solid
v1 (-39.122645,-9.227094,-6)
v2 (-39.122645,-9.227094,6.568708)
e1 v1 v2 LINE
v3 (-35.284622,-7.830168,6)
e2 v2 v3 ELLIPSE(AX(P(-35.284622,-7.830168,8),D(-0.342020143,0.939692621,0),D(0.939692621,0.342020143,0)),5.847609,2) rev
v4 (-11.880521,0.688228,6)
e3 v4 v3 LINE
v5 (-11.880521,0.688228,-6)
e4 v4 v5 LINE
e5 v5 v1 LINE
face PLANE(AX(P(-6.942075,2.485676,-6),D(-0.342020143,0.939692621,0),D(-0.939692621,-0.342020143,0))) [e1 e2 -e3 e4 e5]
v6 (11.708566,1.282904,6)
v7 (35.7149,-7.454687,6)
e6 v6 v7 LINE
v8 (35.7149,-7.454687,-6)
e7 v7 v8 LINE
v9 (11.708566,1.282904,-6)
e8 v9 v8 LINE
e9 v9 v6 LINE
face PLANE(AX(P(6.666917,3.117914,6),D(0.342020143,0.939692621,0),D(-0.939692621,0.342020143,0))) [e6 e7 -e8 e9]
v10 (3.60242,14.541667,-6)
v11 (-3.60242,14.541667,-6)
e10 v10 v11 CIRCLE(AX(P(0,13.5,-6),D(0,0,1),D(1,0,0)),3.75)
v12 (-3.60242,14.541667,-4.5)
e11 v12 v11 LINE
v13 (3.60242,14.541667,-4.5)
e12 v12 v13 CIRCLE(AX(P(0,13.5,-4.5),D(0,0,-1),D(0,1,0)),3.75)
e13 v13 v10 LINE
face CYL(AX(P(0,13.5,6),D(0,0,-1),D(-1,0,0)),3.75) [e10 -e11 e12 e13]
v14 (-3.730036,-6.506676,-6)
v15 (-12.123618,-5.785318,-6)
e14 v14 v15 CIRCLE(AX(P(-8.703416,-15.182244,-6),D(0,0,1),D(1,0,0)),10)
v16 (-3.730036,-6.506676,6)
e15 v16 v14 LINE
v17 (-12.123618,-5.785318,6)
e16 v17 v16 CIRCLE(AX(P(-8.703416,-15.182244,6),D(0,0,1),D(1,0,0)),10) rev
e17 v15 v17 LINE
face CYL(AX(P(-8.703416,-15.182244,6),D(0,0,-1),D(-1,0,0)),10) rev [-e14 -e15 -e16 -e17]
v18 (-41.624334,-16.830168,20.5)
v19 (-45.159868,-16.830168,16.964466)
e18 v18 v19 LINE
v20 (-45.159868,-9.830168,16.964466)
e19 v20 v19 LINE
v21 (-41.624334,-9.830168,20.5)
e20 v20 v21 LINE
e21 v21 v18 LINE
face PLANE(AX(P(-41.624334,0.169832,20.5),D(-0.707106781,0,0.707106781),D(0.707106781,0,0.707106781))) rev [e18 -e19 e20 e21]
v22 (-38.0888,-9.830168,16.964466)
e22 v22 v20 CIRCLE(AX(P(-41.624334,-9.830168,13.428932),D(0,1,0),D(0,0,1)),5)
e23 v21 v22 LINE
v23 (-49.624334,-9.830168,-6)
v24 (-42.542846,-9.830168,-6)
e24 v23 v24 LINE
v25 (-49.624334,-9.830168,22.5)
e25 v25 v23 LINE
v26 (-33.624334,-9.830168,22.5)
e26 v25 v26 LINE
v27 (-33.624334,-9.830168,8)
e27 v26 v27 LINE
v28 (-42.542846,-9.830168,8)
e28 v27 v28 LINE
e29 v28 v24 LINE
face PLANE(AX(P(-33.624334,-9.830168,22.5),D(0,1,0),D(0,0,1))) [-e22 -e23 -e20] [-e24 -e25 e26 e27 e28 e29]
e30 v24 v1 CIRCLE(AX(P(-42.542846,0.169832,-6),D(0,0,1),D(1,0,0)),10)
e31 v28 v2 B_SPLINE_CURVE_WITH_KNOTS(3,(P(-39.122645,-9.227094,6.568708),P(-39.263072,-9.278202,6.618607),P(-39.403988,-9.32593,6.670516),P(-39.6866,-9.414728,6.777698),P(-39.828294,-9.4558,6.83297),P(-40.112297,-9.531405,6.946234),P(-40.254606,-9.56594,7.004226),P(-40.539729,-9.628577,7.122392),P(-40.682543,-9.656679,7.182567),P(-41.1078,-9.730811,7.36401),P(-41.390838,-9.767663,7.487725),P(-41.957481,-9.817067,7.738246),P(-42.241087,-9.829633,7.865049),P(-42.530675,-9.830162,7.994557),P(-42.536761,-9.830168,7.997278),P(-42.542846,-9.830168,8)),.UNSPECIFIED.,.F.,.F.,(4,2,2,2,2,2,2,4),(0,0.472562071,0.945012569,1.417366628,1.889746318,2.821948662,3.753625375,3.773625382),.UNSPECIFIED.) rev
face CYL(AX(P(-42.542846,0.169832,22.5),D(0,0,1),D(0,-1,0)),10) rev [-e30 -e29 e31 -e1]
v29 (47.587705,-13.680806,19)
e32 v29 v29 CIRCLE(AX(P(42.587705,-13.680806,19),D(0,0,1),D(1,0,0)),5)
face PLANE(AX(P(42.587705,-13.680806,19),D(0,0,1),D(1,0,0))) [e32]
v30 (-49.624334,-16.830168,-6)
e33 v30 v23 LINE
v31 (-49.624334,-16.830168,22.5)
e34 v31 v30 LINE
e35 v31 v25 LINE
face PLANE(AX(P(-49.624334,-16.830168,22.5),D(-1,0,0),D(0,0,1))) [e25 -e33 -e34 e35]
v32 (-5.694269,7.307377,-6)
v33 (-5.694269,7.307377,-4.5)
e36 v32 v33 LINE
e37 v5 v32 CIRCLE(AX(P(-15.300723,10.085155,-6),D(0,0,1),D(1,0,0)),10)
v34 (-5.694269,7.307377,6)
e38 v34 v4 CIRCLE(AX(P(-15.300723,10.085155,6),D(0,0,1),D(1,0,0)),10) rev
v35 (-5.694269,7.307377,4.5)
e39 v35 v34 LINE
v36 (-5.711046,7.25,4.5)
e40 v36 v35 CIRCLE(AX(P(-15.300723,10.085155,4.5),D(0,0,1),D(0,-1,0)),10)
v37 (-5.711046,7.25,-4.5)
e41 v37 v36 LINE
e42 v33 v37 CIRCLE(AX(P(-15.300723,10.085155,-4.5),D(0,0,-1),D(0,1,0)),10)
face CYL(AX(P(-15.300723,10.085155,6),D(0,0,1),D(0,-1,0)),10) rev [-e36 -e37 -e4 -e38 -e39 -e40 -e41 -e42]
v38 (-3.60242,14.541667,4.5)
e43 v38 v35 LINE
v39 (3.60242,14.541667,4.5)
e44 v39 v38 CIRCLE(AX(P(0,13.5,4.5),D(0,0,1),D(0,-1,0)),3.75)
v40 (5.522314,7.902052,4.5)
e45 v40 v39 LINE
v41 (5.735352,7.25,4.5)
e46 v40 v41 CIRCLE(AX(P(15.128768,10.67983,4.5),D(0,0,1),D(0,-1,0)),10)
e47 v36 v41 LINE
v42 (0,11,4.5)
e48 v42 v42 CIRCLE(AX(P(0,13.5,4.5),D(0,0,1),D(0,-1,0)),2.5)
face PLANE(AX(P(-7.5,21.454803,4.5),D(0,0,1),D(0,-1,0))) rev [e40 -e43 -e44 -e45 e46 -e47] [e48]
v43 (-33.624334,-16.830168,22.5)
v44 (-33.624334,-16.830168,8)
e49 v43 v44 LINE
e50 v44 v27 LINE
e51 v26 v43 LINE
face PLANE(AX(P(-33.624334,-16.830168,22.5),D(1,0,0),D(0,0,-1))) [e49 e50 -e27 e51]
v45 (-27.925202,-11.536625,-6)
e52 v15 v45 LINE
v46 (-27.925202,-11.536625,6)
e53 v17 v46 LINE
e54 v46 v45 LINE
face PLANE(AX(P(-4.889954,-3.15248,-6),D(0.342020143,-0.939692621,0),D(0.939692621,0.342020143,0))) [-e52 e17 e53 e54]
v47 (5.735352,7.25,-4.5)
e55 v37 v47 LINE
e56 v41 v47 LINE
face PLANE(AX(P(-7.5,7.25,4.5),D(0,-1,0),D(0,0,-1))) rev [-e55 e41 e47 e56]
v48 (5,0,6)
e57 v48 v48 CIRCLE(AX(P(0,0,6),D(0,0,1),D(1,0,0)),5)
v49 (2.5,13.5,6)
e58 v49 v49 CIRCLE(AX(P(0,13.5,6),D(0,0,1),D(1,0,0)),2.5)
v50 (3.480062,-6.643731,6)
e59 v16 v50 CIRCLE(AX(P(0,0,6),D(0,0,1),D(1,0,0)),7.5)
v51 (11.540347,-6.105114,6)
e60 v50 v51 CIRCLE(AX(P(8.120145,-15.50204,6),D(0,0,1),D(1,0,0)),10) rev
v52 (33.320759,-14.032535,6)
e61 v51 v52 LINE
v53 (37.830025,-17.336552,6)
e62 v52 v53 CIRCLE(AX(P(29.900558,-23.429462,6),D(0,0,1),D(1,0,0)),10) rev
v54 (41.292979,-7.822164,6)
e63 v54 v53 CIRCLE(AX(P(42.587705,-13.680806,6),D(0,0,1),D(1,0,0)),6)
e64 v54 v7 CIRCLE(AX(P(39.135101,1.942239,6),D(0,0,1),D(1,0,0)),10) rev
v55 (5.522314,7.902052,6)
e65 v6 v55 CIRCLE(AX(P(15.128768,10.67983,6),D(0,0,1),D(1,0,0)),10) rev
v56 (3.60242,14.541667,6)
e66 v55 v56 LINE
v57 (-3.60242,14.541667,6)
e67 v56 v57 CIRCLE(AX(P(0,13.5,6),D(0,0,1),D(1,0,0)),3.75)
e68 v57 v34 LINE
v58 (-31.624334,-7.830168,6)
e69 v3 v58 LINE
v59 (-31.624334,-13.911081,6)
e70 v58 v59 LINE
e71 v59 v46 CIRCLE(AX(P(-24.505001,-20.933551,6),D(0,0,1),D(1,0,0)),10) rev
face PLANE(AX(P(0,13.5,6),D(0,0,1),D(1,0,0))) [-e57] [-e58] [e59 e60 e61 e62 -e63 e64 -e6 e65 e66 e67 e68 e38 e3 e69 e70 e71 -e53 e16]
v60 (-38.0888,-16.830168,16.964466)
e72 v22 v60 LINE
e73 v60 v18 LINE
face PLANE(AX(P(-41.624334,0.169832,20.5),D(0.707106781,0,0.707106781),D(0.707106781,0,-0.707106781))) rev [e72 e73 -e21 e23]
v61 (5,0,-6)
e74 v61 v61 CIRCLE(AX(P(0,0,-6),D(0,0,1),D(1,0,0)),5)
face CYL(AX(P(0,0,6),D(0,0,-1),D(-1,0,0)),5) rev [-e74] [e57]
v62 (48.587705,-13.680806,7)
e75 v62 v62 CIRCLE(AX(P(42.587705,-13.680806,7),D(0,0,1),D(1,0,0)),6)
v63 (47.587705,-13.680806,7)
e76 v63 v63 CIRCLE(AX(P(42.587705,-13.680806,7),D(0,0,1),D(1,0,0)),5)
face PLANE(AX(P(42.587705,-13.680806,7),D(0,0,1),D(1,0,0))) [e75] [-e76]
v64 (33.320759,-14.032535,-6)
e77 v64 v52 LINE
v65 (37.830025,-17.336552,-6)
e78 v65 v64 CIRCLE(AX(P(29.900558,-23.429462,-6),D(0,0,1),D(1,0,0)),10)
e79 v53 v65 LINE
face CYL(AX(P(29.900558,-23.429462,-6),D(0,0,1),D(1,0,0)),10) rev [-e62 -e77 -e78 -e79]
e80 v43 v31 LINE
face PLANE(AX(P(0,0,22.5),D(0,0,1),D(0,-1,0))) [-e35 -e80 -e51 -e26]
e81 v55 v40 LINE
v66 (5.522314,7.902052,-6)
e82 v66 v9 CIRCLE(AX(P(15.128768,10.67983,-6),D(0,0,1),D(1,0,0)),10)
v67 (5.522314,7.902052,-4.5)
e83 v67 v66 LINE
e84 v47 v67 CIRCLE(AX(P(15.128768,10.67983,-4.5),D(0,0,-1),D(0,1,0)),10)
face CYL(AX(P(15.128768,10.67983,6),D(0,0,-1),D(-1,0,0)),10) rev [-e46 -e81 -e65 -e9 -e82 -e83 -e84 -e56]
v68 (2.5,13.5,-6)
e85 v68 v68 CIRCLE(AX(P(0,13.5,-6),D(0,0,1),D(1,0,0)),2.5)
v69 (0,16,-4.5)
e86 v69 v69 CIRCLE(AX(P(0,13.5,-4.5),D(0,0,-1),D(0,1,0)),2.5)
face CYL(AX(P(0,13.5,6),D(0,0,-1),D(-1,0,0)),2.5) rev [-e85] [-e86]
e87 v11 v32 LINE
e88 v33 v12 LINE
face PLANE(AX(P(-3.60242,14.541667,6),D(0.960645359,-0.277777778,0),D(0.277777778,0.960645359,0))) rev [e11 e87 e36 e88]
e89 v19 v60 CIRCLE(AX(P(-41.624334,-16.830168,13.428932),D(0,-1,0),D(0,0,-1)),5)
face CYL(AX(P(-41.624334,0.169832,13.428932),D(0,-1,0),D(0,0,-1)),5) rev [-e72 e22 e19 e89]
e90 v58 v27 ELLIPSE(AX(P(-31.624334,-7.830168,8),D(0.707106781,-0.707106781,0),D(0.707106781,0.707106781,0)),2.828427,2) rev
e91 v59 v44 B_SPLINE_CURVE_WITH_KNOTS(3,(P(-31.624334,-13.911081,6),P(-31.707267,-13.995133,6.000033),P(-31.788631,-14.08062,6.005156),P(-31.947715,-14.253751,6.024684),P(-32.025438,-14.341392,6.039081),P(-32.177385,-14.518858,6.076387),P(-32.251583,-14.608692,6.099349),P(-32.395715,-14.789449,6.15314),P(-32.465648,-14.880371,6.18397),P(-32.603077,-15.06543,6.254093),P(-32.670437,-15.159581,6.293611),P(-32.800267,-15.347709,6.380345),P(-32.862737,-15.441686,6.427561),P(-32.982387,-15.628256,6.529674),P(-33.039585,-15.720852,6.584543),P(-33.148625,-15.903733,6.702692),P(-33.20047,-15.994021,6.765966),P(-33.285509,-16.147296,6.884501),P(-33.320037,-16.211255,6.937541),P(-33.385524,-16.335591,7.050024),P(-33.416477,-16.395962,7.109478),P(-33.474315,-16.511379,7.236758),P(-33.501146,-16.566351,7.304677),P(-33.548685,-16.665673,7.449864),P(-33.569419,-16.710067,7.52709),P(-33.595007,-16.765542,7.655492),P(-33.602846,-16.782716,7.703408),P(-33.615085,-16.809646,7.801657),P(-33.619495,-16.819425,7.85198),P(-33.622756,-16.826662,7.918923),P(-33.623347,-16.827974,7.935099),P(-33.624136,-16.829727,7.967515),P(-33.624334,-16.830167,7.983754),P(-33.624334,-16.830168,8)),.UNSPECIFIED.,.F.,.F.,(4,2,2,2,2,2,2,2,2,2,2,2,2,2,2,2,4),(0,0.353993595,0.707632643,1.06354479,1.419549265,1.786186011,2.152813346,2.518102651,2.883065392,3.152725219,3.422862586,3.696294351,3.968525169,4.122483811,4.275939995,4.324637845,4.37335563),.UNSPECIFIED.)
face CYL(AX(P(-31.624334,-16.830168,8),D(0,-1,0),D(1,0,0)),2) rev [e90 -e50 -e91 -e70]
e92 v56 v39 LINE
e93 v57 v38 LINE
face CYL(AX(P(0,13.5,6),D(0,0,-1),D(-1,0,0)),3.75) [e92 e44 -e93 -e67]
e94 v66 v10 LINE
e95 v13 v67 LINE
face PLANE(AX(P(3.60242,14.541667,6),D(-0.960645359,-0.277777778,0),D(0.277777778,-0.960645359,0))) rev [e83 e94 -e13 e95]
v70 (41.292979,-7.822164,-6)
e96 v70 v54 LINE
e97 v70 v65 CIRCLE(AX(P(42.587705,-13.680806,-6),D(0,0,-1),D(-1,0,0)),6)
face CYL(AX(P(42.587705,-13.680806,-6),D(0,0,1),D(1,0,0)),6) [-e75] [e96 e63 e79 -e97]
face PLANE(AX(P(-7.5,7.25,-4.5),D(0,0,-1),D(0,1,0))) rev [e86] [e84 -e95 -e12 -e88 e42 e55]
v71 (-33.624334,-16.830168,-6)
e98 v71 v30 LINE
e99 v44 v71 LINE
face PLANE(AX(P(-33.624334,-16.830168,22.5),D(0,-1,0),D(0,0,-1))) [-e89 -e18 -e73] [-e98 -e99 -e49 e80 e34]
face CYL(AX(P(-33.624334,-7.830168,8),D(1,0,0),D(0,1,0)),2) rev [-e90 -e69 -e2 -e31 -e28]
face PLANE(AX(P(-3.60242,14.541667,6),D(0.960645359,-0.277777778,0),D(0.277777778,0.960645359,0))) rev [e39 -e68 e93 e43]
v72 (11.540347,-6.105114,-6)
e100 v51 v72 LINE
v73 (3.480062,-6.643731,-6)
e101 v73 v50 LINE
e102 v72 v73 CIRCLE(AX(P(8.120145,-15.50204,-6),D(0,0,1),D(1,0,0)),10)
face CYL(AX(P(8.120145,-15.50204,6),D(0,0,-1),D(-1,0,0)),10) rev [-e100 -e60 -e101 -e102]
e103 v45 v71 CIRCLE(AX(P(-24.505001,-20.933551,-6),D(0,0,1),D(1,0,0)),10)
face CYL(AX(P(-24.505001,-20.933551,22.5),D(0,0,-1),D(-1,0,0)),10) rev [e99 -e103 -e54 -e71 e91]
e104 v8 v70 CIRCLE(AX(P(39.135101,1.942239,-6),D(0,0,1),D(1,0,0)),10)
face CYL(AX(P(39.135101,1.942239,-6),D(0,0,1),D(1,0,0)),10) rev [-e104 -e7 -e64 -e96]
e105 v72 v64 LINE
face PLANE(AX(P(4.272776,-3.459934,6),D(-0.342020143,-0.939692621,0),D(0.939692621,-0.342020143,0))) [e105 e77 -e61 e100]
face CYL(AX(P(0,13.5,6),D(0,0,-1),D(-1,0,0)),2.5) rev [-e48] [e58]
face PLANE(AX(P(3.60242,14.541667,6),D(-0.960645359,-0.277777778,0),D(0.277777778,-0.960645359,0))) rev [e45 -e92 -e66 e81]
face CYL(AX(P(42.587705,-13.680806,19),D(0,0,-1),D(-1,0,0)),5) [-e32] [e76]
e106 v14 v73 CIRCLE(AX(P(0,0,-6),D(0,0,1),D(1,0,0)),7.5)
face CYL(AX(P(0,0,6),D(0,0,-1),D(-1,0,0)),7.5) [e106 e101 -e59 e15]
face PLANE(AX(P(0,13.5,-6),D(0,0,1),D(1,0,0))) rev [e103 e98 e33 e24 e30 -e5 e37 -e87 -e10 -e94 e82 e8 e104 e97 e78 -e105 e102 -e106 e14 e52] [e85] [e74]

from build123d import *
from build123d.topology import SkipClean

# Parameters (mm, degrees)
CROQUIS1_R                 = 5
CROQUIS1_R_2               = 2.5
SALIENTE_EXTRUIR1_DEPTH    = 6
CORTAR_EXTRUIR1_DEPTH      = 20.743669872
CORTAR_EXTRUIR1_DEPTH_BACK = 20.743669872
CROQUIS3_W                 = 9
CROQUIS3_H                 = 14.204802578
CROQUIS4_W                 = 12
CROQUIS4_H                 = 6
SALIENTE_EXTRUIR2_DEPTH    = 38
CROQUIS8_W                 = 12
CROQUIS8_H                 = 7
SALIENTE_EXTRUIR5_DEPTH    = 39.5
CROQUIS9_R                 = 5
SALIENTE_EXTRUIR6_DEPTH    = 19
CROQUIS11_R                = 6
SALIENTE_EXTRUIR7_DEPTH    = 6
CROQUIS22_W                = 16
CROQUIS22_H                = 7
SALIENTE_EXTRUIR12_DEPTH   = 28.5
CORTAR_EXTRUIR3_DEPTH      = 17
REDONDEO1_R                = 10
REDONDEO2_R                = 10
REDONDEO3_R                = 2
CROQUIS25_R                = 6
SALIENTE_EXTRUIR13_DEPTH   = 1


with BuildPart() as part:
    # Croquis1 → Saliente-Extruir1 (new, symmetric)
    with BuildSketch(Plane.XY):
        with BuildLine():
            Line((-3.602420097, 14.541666667), (-7.204840194, 2.083333333))
            ThreePointArc((-7.204840194, 2.083333333), (0, -7.5), (7.204840194, 2.083333333))
            Line((7.204840194, 2.083333333), (3.602420097, 14.541666667))
            ThreePointArc((3.602420097, 14.541666667), (0, 17.25), (-3.602420097, 14.541666667))
        make_face()
        Circle(CROQUIS1_R, mode=Mode.SUBTRACT)
        with Locations((0, 13.5)):
            Circle(CROQUIS1_R_2, mode=Mode.SUBTRACT)
    extrude(amount=SALIENTE_EXTRUIR1_DEPTH, both=True)

    # Croquis3 → Cortar-Extruir1 (cut, two sides: drawn at the far end of the back side and taken through both)
    with BuildSketch(Plane(origin=(0, 0, 0), x_dir=(0, 0, -1), z_dir=(1, 0, 0)).offset(-CORTAR_EXTRUIR1_DEPTH_BACK)):
        with Locations((0, 14.352401289)):
            Rectangle(CROQUIS3_W, CROQUIS3_H)
    extrude(amount=CORTAR_EXTRUIR1_DEPTH + CORTAR_EXTRUIR1_DEPTH_BACK, mode=Mode.SUBTRACT)

    # Croquis4 → Saliente-Extruir2 (add)
    with BuildSketch(Plane(origin=(-41.624334392, -13.330167568, 0), x_dir=(0, 0, 1), z_dir=(-0.9396926207859082, -0.3420201433256695, 0))):
        Rectangle(CROQUIS4_W, CROQUIS4_H)
    extrude(amount=-SALIENTE_EXTRUIR2_DEPTH)

    # Croquis8 → Saliente-Extruir5 (add)
    with BuildSketch(Plane(origin=(42.587704831, -13.680805733, 0), x_dir=(0, 0, -1), z_dir=(0.9396926207859082, -0.34202014332566943, 0))):
        Rectangle(CROQUIS8_W, CROQUIS8_H)
    extrude(amount=-SALIENTE_EXTRUIR5_DEPTH)

    # Croquis9 → Saliente-Extruir6 (add)
    with BuildSketch(Plane.XY):
        with Locations(Location((42.587704831, -13.680805733, 0), (0, 0, 204.427004001))):
            Circle(CROQUIS9_R)
    extrude(amount=SALIENTE_EXTRUIR6_DEPTH)

    # Croquis11 → Saliente-Extruir7 (add, symmetric)
    with BuildSketch(Plane(origin=(0, 0, 0), x_dir=(-1, 0, 0), z_dir=(0, 0, -1))):
        with Locations((-42.587704831, -13.680805733)):
            Circle(CROQUIS11_R)
    extrude(amount=SALIENTE_EXTRUIR7_DEPTH, both=True)

    # Croquis22 → Saliente-Extruir12 (add)
    with BuildSketch(Plane(origin=(0, 0, -6), x_dir=(-1, 0, 0), z_dir=(0, 0, -1))):
        with Locations((41.624334392, -13.330167568)):
            Rectangle(CROQUIS22_W, CROQUIS22_H)
    extrude(amount=-SALIENTE_EXTRUIR12_DEPTH)

    # Croquis24 → Cortar-Extruir3 (cut)
    with BuildSketch(Plane.XZ.offset(16.830167568)):
        with BuildLine():
            Line((-41.624334392, 20.5), (-45.159868298, 16.964466094))
            ThreePointArc((-45.159868298, 16.964466094), (-41.624334392, 8.428932188), (-38.088800486, 16.964466094))
            Line((-38.088800486, 16.964466094), (-41.624334392, 20.5))
        make_face()
    extrude(amount=-CORTAR_EXTRUIR3_DEPTH, mode=Mode.SUBTRACT)

    # Redondeo1
    # the kernel refuses this fillet: 10 mm, written as the material it adds along each edge
    with BuildSketch(Plane(origin=(-6.501507493, -3.739037351, -6), x_dir=(-0.9396926207859082, -0.34202014332566955, 0), z_dir=(0, 0, 1))) as redondeo1_piece_1:
        with BuildLine():
            CenterArc((5.982924808, 10), REDONDEO1_R, 220.175955677, 49.824044323)
            ThreePointArc((-1.657743486, 3.548628981), (-0.593131346, 1.884440714), (0, 0))
            Line((0, 0), (5.982924808, 0))
        make_face()
    extrude(amount=12)
    with BuildSketch(Plane(origin=(6.231868861, -4.172985802, -6), x_dir=(-0.7440842561226181, -0.668085787747689, 0), z_dir=(0, 0, 1))) as redondeo1_piece_2:
        with BuildLine():
            CenterArc((6.16374333, 9.691301404), REDONDEO1_R, 208.080503653, 47.646059692)
            Line((-2.659127557, 4.984184526), (0, 0))
            ThreePointArc((0, 0), (1.849122999, 0.231523947), (3.698245998, 0))
        make_face()
    extrude(amount=12)
    with BuildSketch(Plane(origin=(6.933768131, 3.020788164, 6), x_dir=(0.9396926207859081, -0.34202014332566955, 0), z_dir=(0, 0, -1))) as redondeo1_piece_3_section:
        with BuildLine():
            CenterArc((REDONDEO1_R * 0.508123414429, -REDONDEO1_R), REDONDEO1_R, 90, 53.872379787)
            Line((-REDONDEO1_R * 0.299582345445, -REDONDEO1_R * 0.410414208562), (0, 0))
            Line((0, 0), (REDONDEO1_R * 0.508123414429, 0))
        make_face()
    redondeo1_piece_3 = extrude(amount=12, mode=Mode.PRIVATE)
    redondeo1_piece_3 = split(redondeo1_piece_3, bisect_by=Plane(origin=(7.707131888, 3.605094571, 4.5), z_dir=(0, 0, 1)), keep=Keep.TOP, mode=Mode.PRIVATE)
    redondeo1_piece_3 = split(redondeo1_piece_3, bisect_by=Plane(origin=(7.707131888, 7.25, 5.25), z_dir=(0, -1, 0)), keep=Keep.TOP, mode=Mode.PRIVATE)
    add(redondeo1_piece_3)
    with BuildSketch(Plane(origin=(6.933768131, 3.020788164, 6), x_dir=(0.9396926207859081, -0.34202014332566955, 0), z_dir=(0, 0, -1))) as redondeo1_piece_4_section:
        with BuildLine():
            CenterArc((REDONDEO1_R * 0.508123414429, -REDONDEO1_R), REDONDEO1_R, 90, 53.872379787)
            Line((-REDONDEO1_R * 0.299582345445, -REDONDEO1_R * 0.410414208562), (0, 0))
            Line((0, 0), (REDONDEO1_R * 0.508123414429, 0))
        make_face()
    redondeo1_piece_4 = extrude(amount=12, mode=Mode.PRIVATE)
    redondeo1_piece_4 = split(redondeo1_piece_4, bisect_by=Plane(origin=(5.523987689, 7.556477911, 4.5), z_dir=(0, 0, 1)), keep=Keep.TOP, mode=Mode.PRIVATE)
    redondeo1_piece_4 = split(redondeo1_piece_4, bisect_by=Plane(origin=(5.523987689, 7.25, 5.25), z_dir=(0, 1, 0)), keep=Keep.TOP, mode=Mode.PRIVATE)
    add(redondeo1_piece_4)
    with BuildSketch(Plane(origin=(6.933768131, 3.020788164, 6), x_dir=(0.9396926207859081, -0.34202014332566955, 0), z_dir=(0, 0, -1))) as redondeo1_piece_5_section:
        with BuildLine():
            CenterArc((REDONDEO1_R * 0.508123414429, -REDONDEO1_R), REDONDEO1_R, 90, 53.872379787)
            Line((-REDONDEO1_R * 0.299582345445, -REDONDEO1_R * 0.410414208562), (0, 0))
            Line((0, 0), (REDONDEO1_R * 0.508123414429, 0))
        make_face()
    redondeo1_piece_5 = extrude(amount=12, mode=Mode.PRIVATE)
    redondeo1_piece_5 = split(redondeo1_piece_5, bisect_by=Plane(origin=(7.707131888, 3.605094571, 4.5), z_dir=(0, 0, -1)), keep=Keep.TOP, mode=Mode.PRIVATE)
    redondeo1_piece_5 = split(redondeo1_piece_5, bisect_by=Plane(origin=(7.707131888, 7.25, 0), z_dir=(0, -1, 0)), keep=Keep.TOP, mode=Mode.PRIVATE)
    redondeo1_piece_5 = split(redondeo1_piece_5, bisect_by=Plane(origin=(7.707131888, 3.605094571, -4.5), z_dir=(0, 0, 1)), keep=Keep.TOP, mode=Mode.PRIVATE)
    add(redondeo1_piece_5)
    with BuildSketch(Plane(origin=(6.933768131, 3.020788164, 6), x_dir=(0.9396926207859081, -0.34202014332566955, 0), z_dir=(0, 0, -1))) as redondeo1_piece_6_section:
        with BuildLine():
            CenterArc((REDONDEO1_R * 0.508123414429, -REDONDEO1_R), REDONDEO1_R, 90, 53.872379787)
            Line((-REDONDEO1_R * 0.299582345445, -REDONDEO1_R * 0.410414208562), (0, 0))
            Line((0, 0), (REDONDEO1_R * 0.508123414429, 0))
        make_face()
    redondeo1_piece_6 = extrude(amount=12, mode=Mode.PRIVATE)
    redondeo1_piece_6 = split(redondeo1_piece_6, bisect_by=Plane(origin=(7.707131888, 7.25, -5.25), z_dir=(0, -1, 0)), keep=Keep.TOP, mode=Mode.PRIVATE)
    redondeo1_piece_6 = split(redondeo1_piece_6, bisect_by=Plane(origin=(7.707131888, 3.605094571, -4.5), z_dir=(0, 0, -1)), keep=Keep.TOP, mode=Mode.PRIVATE)
    add(redondeo1_piece_6)
    with BuildSketch(Plane(origin=(6.933768131, 3.020788164, 6), x_dir=(0.9396926207859081, -0.34202014332566955, 0), z_dir=(0, 0, -1))) as redondeo1_piece_7_section:
        with BuildLine():
            CenterArc((REDONDEO1_R * 0.508123414429, -REDONDEO1_R), REDONDEO1_R, 90, 53.872379787)
            Line((-REDONDEO1_R * 0.299582345445, -REDONDEO1_R * 0.410414208562), (0, 0))
            Line((0, 0), (REDONDEO1_R * 0.508123414429, 0))
        make_face()
    redondeo1_piece_7 = extrude(amount=12, mode=Mode.PRIVATE)
    redondeo1_piece_7 = split(redondeo1_piece_7, bisect_by=Plane(origin=(5.523987689, 7.25, -5.25), z_dir=(0, 1, 0)), keep=Keep.TOP, mode=Mode.PRIVATE)
    redondeo1_piece_7 = split(redondeo1_piece_7, bisect_by=Plane(origin=(5.523987689, 7.556477911, -4.5), z_dir=(0, 0, -1)), keep=Keep.TOP, mode=Mode.PRIVATE)
    add(redondeo1_piece_7)
    with BuildSketch(Plane(origin=(-7.105722939, 2.426112846, -6), x_dir=(0.2777777777777774, 0.9606453592105879, 0), z_dir=(0, 0, 1))) as redondeo1_piece_8_section:
        with BuildLine():
            CenterArc((REDONDEO1_R * 0.508123414429, REDONDEO1_R), REDONDEO1_R, 216.127620213, 53.872379787)
            Line((-REDONDEO1_R * 0.299582345445, REDONDEO1_R * 0.410414208562), (0, 0))
            Line((0, 0), (REDONDEO1_R * 0.508123414429, 0))
        make_face()
    redondeo1_piece_8 = extrude(amount=12, mode=Mode.PRIVATE)
    redondeo1_piece_8 = split(redondeo1_piece_8, bisect_by=Plane(origin=(-5.633833438, 7.269141523, -4.5), z_dir=(0, 0, -1)), keep=Keep.TOP, mode=Mode.PRIVATE)
    redondeo1_piece_8 = split(redondeo1_piece_8, bisect_by=Plane(origin=(-5.633833438, 7.25, -5.25), z_dir=(0, 1, 0)), keep=Keep.TOP, mode=Mode.PRIVATE)
    add(redondeo1_piece_8)
    with BuildSketch(Plane(origin=(-7.105722939, 2.426112846, -6), x_dir=(0.2777777777777774, 0.9606453592105879, 0), z_dir=(0, 0, 1))) as redondeo1_piece_9_section:
        with BuildLine():
            CenterArc((REDONDEO1_R * 0.508123414429, REDONDEO1_R), REDONDEO1_R, 216.127620213, 53.872379787)
            Line((-REDONDEO1_R * 0.299582345445, REDONDEO1_R * 0.410414208562), (0, 0))
            Line((0, 0), (REDONDEO1_R * 0.508123414429, 0))
        make_face()
    redondeo1_piece_9 = extrude(amount=12, mode=Mode.PRIVATE)
    redondeo1_piece_9 = split(redondeo1_piece_9, bisect_by=Plane(origin=(-7.830945447, 3.097346967, -4.5), z_dir=(0, 0, -1)), keep=Keep.TOP, mode=Mode.PRIVATE)
    redondeo1_piece_9 = split(redondeo1_piece_9, bisect_by=Plane(origin=(-7.830945447, 7.25, -5.25), z_dir=(0, -1, 0)), keep=Keep.TOP, mode=Mode.PRIVATE)
    add(redondeo1_piece_9)
    with BuildSketch(Plane(origin=(-7.105722939, 2.426112846, -6), x_dir=(0.2777777777777774, 0.9606453592105879, 0), z_dir=(0, 0, 1))) as redondeo1_piece_10_section:
        with BuildLine():
            CenterArc((REDONDEO1_R * 0.508123414429, REDONDEO1_R), REDONDEO1_R, 216.127620213, 53.872379787)
            Line((-REDONDEO1_R * 0.299582345445, REDONDEO1_R * 0.410414208562), (0, 0))
            Line((0, 0), (REDONDEO1_R * 0.508123414429, 0))
        make_face()
    redondeo1_piece_10 = extrude(amount=12, mode=Mode.PRIVATE)
    redondeo1_piece_10 = split(redondeo1_piece_10, bisect_by=Plane(origin=(-7.830945447, 3.097346967, -4.5), z_dir=(0, 0, 1)), keep=Keep.TOP, mode=Mode.PRIVATE)
    redondeo1_piece_10 = split(redondeo1_piece_10, bisect_by=Plane(origin=(-7.830945447, 7.25, 0), z_dir=(0, -1, 0)), keep=Keep.TOP, mode=Mode.PRIVATE)
    redondeo1_piece_10 = split(redondeo1_piece_10, bisect_by=Plane(origin=(-7.830945447, 3.097346967, 4.5), z_dir=(0, 0, -1)), keep=Keep.TOP, mode=Mode.PRIVATE)
    add(redondeo1_piece_10)
    with BuildSketch(Plane(origin=(-7.105722939, 2.426112846, -6), x_dir=(0.2777777777777774, 0.9606453592105879, 0), z_dir=(0, 0, 1))) as redondeo1_piece_11_section:
        with BuildLine():
            CenterArc((REDONDEO1_R * 0.508123414429, REDONDEO1_R), REDONDEO1_R, 216.127620213, 53.872379787)
            Line((-REDONDEO1_R * 0.299582345445, REDONDEO1_R * 0.410414208562), (0, 0))
            Line((0, 0), (REDONDEO1_R * 0.508123414429, 0))
        make_face()
    redondeo1_piece_11 = extrude(amount=12, mode=Mode.PRIVATE)
    redondeo1_piece_11 = split(redondeo1_piece_11, bisect_by=Plane(origin=(-5.633833438, 7.25, 5.25), z_dir=(0, 1, 0)), keep=Keep.TOP, mode=Mode.PRIVATE)
    redondeo1_piece_11 = split(redondeo1_piece_11, bisect_by=Plane(origin=(-5.633833438, 7.269141523, 4.5), z_dir=(0, 0, 1)), keep=Keep.TOP, mode=Mode.PRIVATE)
    add(redondeo1_piece_11)
    with BuildSketch(Plane(origin=(-7.105722939, 2.426112846, -6), x_dir=(0.2777777777777774, 0.9606453592105879, 0), z_dir=(0, 0, 1))) as redondeo1_piece_12_section:
        with BuildLine():
            CenterArc((REDONDEO1_R * 0.508123414429, REDONDEO1_R), REDONDEO1_R, 216.127620213, 53.872379787)
            Line((-REDONDEO1_R * 0.299582345445, REDONDEO1_R * 0.410414208562), (0, 0))
            Line((0, 0), (REDONDEO1_R * 0.508123414429, 0))
        make_face()
    redondeo1_piece_12 = extrude(amount=12, mode=Mode.PRIVATE)
    redondeo1_piece_12 = split(redondeo1_piece_12, bisect_by=Plane(origin=(-7.830945447, 7.25, 5.25), z_dir=(0, -1, 0)), keep=Keep.TOP, mode=Mode.PRIVATE)
    redondeo1_piece_12 = split(redondeo1_piece_12, bisect_by=Plane(origin=(-7.830945447, 3.097346967, 4.5), z_dir=(0, 0, 1)), keep=Keep.TOP, mode=Mode.PRIVATE)
    add(redondeo1_piece_12)

    # Redondeo2
    # the kernel refuses this fillet: 10 mm, written as the material it adds along each edge
    with BuildSketch(Plane(origin=(-33.624334392, -13.610939012, 6), x_dir=(0, -1, 0), z_dir=(0, 0, -1))) as redondeo2_piece_1:
        with BuildLine():
            CenterArc((7.32261171, -9.119333676), REDONDEO2_R, 114.226089014, 45.773910986)
            Line((-2.074314498, -5.699132243), (-2.262253022, -5.630728214))
            Line((-2.262253022, -5.630728214), (-0.187938524, 0.068404029))
            Line((-0.187938524, 0.068404029), (0, 0.2))
            ThreePointArc((0, 0.2), (1.609614278, 0.2), (3.137160894, 0.182386674))
            Line((3.137160894, 0.182386674), (3.219228557, 0))
        make_face()
    extrude(amount=12)
    with BuildSketch(Plane(origin=(-40.779576624, -9.830167568, -6), x_dir=(0.9396926207859088, 0.3420201433256678, 0), z_dir=(0, 0, 1))) as redondeo2_piece_2:
        with BuildLine():
            CenterArc((REDONDEO2_R * 0.176326980708, REDONDEO2_R), REDONDEO2_R, 250, 20)
            Line((-REDONDEO2_R * 0.165693162617, REDONDEO2_R * 0.0603073792141), (-REDONDEO2_R * 0.172533565484, REDONDEO2_R * 0.0415135267984))
            Line((-REDONDEO2_R * 0.172533565484, REDONDEO2_R * 0.0415135267984), (-REDONDEO2_R * 0.00352653961417, -REDONDEO2_R * 0.02))
            Line((-REDONDEO2_R * 0.00352653961417, -REDONDEO2_R * 0.02), (REDONDEO2_R * 0.176326980708, -REDONDEO2_R * 0.02))
            Line((REDONDEO2_R * 0.176326980708, -REDONDEO2_R * 0.02), (REDONDEO2_R * 0.176326980708, 0))
        make_face()
    extrude(amount=12)
    with BuildSketch(Plane(origin=(36.811138969, -15.302929906, 6), x_dir=(-0.9396926207859084, 0.3420201433256687, 0), z_dir=(0, 0, -1))) as redondeo2_piece_3:
        with BuildLine():
            CenterArc((3.714384846, -10), REDONDEO2_R, 90, 32.461744967)
            Line((-1.652978915, -1.5625), (-1.760326191, -1.39375))
            ThreePointArc((-1.760326191, -1.39375), (-0.889157213, -0.714953374), (-0.162446572, 0.116666667))
            Line((-0.162446572, 0.116666667), (0, 0.2))
            Line((0, 0.2), (3.714384846, 0.2))
            Line((3.714384846, 0.2), (3.714384846, 0))
        make_face()
    extrude(amount=12)
    with BuildSketch(Plane(origin=(39.205279972, -8.725081561, 6), x_dir=(0.917836362849066, 0.39695895383779634, 0), z_dir=(0, 0, -1))) as redondeo2_piece_4:
        with BuildLine():
            CenterArc((4.170075975, -9.818712805), REDONDEO2_R, 100.92646016, 32.461744967)
            Line((-2.699303266, -2.551551815), (-2.83669085, -2.406208596))
            Line((-2.83669085, -2.406208596), (-0.137387585, 0.14534322))
            Line((-0.137387585, 0.14534322), (0.037909782, 0.196374256))
            ThreePointArc((0.037909782, 0.196374256), (1.137293448, 0.091227683), (2.236677114, 0.196374256))
            Line((2.236677114, 0.196374256), (2.274586895, 0))
        make_face()
    extrude(amount=12)

    # Redondeo3
    redondeo3_edges = [part.edges().sort_by_distance(p)[0] for p in [
        (-33.624334392, -13.330167568, 6),
        (-38.083590411, -9.830167568, 6),
    ]]
    fillet(redondeo3_edges, radius=REDONDEO3_R)

    # Croquis25 → Saliente-Extruir13 (add)
    with SkipClean():  # the faces are left unmerged after this step: merging them gives an invalid solid
        with BuildSketch(Plane.XY.offset(6)):
            with Locations((42.587704831, -13.680805733)):
                Circle(CROQUIS25_R)
        extrude(amount=SALIENTE_EXTRUIR13_DEPTH)


solid = part.part
